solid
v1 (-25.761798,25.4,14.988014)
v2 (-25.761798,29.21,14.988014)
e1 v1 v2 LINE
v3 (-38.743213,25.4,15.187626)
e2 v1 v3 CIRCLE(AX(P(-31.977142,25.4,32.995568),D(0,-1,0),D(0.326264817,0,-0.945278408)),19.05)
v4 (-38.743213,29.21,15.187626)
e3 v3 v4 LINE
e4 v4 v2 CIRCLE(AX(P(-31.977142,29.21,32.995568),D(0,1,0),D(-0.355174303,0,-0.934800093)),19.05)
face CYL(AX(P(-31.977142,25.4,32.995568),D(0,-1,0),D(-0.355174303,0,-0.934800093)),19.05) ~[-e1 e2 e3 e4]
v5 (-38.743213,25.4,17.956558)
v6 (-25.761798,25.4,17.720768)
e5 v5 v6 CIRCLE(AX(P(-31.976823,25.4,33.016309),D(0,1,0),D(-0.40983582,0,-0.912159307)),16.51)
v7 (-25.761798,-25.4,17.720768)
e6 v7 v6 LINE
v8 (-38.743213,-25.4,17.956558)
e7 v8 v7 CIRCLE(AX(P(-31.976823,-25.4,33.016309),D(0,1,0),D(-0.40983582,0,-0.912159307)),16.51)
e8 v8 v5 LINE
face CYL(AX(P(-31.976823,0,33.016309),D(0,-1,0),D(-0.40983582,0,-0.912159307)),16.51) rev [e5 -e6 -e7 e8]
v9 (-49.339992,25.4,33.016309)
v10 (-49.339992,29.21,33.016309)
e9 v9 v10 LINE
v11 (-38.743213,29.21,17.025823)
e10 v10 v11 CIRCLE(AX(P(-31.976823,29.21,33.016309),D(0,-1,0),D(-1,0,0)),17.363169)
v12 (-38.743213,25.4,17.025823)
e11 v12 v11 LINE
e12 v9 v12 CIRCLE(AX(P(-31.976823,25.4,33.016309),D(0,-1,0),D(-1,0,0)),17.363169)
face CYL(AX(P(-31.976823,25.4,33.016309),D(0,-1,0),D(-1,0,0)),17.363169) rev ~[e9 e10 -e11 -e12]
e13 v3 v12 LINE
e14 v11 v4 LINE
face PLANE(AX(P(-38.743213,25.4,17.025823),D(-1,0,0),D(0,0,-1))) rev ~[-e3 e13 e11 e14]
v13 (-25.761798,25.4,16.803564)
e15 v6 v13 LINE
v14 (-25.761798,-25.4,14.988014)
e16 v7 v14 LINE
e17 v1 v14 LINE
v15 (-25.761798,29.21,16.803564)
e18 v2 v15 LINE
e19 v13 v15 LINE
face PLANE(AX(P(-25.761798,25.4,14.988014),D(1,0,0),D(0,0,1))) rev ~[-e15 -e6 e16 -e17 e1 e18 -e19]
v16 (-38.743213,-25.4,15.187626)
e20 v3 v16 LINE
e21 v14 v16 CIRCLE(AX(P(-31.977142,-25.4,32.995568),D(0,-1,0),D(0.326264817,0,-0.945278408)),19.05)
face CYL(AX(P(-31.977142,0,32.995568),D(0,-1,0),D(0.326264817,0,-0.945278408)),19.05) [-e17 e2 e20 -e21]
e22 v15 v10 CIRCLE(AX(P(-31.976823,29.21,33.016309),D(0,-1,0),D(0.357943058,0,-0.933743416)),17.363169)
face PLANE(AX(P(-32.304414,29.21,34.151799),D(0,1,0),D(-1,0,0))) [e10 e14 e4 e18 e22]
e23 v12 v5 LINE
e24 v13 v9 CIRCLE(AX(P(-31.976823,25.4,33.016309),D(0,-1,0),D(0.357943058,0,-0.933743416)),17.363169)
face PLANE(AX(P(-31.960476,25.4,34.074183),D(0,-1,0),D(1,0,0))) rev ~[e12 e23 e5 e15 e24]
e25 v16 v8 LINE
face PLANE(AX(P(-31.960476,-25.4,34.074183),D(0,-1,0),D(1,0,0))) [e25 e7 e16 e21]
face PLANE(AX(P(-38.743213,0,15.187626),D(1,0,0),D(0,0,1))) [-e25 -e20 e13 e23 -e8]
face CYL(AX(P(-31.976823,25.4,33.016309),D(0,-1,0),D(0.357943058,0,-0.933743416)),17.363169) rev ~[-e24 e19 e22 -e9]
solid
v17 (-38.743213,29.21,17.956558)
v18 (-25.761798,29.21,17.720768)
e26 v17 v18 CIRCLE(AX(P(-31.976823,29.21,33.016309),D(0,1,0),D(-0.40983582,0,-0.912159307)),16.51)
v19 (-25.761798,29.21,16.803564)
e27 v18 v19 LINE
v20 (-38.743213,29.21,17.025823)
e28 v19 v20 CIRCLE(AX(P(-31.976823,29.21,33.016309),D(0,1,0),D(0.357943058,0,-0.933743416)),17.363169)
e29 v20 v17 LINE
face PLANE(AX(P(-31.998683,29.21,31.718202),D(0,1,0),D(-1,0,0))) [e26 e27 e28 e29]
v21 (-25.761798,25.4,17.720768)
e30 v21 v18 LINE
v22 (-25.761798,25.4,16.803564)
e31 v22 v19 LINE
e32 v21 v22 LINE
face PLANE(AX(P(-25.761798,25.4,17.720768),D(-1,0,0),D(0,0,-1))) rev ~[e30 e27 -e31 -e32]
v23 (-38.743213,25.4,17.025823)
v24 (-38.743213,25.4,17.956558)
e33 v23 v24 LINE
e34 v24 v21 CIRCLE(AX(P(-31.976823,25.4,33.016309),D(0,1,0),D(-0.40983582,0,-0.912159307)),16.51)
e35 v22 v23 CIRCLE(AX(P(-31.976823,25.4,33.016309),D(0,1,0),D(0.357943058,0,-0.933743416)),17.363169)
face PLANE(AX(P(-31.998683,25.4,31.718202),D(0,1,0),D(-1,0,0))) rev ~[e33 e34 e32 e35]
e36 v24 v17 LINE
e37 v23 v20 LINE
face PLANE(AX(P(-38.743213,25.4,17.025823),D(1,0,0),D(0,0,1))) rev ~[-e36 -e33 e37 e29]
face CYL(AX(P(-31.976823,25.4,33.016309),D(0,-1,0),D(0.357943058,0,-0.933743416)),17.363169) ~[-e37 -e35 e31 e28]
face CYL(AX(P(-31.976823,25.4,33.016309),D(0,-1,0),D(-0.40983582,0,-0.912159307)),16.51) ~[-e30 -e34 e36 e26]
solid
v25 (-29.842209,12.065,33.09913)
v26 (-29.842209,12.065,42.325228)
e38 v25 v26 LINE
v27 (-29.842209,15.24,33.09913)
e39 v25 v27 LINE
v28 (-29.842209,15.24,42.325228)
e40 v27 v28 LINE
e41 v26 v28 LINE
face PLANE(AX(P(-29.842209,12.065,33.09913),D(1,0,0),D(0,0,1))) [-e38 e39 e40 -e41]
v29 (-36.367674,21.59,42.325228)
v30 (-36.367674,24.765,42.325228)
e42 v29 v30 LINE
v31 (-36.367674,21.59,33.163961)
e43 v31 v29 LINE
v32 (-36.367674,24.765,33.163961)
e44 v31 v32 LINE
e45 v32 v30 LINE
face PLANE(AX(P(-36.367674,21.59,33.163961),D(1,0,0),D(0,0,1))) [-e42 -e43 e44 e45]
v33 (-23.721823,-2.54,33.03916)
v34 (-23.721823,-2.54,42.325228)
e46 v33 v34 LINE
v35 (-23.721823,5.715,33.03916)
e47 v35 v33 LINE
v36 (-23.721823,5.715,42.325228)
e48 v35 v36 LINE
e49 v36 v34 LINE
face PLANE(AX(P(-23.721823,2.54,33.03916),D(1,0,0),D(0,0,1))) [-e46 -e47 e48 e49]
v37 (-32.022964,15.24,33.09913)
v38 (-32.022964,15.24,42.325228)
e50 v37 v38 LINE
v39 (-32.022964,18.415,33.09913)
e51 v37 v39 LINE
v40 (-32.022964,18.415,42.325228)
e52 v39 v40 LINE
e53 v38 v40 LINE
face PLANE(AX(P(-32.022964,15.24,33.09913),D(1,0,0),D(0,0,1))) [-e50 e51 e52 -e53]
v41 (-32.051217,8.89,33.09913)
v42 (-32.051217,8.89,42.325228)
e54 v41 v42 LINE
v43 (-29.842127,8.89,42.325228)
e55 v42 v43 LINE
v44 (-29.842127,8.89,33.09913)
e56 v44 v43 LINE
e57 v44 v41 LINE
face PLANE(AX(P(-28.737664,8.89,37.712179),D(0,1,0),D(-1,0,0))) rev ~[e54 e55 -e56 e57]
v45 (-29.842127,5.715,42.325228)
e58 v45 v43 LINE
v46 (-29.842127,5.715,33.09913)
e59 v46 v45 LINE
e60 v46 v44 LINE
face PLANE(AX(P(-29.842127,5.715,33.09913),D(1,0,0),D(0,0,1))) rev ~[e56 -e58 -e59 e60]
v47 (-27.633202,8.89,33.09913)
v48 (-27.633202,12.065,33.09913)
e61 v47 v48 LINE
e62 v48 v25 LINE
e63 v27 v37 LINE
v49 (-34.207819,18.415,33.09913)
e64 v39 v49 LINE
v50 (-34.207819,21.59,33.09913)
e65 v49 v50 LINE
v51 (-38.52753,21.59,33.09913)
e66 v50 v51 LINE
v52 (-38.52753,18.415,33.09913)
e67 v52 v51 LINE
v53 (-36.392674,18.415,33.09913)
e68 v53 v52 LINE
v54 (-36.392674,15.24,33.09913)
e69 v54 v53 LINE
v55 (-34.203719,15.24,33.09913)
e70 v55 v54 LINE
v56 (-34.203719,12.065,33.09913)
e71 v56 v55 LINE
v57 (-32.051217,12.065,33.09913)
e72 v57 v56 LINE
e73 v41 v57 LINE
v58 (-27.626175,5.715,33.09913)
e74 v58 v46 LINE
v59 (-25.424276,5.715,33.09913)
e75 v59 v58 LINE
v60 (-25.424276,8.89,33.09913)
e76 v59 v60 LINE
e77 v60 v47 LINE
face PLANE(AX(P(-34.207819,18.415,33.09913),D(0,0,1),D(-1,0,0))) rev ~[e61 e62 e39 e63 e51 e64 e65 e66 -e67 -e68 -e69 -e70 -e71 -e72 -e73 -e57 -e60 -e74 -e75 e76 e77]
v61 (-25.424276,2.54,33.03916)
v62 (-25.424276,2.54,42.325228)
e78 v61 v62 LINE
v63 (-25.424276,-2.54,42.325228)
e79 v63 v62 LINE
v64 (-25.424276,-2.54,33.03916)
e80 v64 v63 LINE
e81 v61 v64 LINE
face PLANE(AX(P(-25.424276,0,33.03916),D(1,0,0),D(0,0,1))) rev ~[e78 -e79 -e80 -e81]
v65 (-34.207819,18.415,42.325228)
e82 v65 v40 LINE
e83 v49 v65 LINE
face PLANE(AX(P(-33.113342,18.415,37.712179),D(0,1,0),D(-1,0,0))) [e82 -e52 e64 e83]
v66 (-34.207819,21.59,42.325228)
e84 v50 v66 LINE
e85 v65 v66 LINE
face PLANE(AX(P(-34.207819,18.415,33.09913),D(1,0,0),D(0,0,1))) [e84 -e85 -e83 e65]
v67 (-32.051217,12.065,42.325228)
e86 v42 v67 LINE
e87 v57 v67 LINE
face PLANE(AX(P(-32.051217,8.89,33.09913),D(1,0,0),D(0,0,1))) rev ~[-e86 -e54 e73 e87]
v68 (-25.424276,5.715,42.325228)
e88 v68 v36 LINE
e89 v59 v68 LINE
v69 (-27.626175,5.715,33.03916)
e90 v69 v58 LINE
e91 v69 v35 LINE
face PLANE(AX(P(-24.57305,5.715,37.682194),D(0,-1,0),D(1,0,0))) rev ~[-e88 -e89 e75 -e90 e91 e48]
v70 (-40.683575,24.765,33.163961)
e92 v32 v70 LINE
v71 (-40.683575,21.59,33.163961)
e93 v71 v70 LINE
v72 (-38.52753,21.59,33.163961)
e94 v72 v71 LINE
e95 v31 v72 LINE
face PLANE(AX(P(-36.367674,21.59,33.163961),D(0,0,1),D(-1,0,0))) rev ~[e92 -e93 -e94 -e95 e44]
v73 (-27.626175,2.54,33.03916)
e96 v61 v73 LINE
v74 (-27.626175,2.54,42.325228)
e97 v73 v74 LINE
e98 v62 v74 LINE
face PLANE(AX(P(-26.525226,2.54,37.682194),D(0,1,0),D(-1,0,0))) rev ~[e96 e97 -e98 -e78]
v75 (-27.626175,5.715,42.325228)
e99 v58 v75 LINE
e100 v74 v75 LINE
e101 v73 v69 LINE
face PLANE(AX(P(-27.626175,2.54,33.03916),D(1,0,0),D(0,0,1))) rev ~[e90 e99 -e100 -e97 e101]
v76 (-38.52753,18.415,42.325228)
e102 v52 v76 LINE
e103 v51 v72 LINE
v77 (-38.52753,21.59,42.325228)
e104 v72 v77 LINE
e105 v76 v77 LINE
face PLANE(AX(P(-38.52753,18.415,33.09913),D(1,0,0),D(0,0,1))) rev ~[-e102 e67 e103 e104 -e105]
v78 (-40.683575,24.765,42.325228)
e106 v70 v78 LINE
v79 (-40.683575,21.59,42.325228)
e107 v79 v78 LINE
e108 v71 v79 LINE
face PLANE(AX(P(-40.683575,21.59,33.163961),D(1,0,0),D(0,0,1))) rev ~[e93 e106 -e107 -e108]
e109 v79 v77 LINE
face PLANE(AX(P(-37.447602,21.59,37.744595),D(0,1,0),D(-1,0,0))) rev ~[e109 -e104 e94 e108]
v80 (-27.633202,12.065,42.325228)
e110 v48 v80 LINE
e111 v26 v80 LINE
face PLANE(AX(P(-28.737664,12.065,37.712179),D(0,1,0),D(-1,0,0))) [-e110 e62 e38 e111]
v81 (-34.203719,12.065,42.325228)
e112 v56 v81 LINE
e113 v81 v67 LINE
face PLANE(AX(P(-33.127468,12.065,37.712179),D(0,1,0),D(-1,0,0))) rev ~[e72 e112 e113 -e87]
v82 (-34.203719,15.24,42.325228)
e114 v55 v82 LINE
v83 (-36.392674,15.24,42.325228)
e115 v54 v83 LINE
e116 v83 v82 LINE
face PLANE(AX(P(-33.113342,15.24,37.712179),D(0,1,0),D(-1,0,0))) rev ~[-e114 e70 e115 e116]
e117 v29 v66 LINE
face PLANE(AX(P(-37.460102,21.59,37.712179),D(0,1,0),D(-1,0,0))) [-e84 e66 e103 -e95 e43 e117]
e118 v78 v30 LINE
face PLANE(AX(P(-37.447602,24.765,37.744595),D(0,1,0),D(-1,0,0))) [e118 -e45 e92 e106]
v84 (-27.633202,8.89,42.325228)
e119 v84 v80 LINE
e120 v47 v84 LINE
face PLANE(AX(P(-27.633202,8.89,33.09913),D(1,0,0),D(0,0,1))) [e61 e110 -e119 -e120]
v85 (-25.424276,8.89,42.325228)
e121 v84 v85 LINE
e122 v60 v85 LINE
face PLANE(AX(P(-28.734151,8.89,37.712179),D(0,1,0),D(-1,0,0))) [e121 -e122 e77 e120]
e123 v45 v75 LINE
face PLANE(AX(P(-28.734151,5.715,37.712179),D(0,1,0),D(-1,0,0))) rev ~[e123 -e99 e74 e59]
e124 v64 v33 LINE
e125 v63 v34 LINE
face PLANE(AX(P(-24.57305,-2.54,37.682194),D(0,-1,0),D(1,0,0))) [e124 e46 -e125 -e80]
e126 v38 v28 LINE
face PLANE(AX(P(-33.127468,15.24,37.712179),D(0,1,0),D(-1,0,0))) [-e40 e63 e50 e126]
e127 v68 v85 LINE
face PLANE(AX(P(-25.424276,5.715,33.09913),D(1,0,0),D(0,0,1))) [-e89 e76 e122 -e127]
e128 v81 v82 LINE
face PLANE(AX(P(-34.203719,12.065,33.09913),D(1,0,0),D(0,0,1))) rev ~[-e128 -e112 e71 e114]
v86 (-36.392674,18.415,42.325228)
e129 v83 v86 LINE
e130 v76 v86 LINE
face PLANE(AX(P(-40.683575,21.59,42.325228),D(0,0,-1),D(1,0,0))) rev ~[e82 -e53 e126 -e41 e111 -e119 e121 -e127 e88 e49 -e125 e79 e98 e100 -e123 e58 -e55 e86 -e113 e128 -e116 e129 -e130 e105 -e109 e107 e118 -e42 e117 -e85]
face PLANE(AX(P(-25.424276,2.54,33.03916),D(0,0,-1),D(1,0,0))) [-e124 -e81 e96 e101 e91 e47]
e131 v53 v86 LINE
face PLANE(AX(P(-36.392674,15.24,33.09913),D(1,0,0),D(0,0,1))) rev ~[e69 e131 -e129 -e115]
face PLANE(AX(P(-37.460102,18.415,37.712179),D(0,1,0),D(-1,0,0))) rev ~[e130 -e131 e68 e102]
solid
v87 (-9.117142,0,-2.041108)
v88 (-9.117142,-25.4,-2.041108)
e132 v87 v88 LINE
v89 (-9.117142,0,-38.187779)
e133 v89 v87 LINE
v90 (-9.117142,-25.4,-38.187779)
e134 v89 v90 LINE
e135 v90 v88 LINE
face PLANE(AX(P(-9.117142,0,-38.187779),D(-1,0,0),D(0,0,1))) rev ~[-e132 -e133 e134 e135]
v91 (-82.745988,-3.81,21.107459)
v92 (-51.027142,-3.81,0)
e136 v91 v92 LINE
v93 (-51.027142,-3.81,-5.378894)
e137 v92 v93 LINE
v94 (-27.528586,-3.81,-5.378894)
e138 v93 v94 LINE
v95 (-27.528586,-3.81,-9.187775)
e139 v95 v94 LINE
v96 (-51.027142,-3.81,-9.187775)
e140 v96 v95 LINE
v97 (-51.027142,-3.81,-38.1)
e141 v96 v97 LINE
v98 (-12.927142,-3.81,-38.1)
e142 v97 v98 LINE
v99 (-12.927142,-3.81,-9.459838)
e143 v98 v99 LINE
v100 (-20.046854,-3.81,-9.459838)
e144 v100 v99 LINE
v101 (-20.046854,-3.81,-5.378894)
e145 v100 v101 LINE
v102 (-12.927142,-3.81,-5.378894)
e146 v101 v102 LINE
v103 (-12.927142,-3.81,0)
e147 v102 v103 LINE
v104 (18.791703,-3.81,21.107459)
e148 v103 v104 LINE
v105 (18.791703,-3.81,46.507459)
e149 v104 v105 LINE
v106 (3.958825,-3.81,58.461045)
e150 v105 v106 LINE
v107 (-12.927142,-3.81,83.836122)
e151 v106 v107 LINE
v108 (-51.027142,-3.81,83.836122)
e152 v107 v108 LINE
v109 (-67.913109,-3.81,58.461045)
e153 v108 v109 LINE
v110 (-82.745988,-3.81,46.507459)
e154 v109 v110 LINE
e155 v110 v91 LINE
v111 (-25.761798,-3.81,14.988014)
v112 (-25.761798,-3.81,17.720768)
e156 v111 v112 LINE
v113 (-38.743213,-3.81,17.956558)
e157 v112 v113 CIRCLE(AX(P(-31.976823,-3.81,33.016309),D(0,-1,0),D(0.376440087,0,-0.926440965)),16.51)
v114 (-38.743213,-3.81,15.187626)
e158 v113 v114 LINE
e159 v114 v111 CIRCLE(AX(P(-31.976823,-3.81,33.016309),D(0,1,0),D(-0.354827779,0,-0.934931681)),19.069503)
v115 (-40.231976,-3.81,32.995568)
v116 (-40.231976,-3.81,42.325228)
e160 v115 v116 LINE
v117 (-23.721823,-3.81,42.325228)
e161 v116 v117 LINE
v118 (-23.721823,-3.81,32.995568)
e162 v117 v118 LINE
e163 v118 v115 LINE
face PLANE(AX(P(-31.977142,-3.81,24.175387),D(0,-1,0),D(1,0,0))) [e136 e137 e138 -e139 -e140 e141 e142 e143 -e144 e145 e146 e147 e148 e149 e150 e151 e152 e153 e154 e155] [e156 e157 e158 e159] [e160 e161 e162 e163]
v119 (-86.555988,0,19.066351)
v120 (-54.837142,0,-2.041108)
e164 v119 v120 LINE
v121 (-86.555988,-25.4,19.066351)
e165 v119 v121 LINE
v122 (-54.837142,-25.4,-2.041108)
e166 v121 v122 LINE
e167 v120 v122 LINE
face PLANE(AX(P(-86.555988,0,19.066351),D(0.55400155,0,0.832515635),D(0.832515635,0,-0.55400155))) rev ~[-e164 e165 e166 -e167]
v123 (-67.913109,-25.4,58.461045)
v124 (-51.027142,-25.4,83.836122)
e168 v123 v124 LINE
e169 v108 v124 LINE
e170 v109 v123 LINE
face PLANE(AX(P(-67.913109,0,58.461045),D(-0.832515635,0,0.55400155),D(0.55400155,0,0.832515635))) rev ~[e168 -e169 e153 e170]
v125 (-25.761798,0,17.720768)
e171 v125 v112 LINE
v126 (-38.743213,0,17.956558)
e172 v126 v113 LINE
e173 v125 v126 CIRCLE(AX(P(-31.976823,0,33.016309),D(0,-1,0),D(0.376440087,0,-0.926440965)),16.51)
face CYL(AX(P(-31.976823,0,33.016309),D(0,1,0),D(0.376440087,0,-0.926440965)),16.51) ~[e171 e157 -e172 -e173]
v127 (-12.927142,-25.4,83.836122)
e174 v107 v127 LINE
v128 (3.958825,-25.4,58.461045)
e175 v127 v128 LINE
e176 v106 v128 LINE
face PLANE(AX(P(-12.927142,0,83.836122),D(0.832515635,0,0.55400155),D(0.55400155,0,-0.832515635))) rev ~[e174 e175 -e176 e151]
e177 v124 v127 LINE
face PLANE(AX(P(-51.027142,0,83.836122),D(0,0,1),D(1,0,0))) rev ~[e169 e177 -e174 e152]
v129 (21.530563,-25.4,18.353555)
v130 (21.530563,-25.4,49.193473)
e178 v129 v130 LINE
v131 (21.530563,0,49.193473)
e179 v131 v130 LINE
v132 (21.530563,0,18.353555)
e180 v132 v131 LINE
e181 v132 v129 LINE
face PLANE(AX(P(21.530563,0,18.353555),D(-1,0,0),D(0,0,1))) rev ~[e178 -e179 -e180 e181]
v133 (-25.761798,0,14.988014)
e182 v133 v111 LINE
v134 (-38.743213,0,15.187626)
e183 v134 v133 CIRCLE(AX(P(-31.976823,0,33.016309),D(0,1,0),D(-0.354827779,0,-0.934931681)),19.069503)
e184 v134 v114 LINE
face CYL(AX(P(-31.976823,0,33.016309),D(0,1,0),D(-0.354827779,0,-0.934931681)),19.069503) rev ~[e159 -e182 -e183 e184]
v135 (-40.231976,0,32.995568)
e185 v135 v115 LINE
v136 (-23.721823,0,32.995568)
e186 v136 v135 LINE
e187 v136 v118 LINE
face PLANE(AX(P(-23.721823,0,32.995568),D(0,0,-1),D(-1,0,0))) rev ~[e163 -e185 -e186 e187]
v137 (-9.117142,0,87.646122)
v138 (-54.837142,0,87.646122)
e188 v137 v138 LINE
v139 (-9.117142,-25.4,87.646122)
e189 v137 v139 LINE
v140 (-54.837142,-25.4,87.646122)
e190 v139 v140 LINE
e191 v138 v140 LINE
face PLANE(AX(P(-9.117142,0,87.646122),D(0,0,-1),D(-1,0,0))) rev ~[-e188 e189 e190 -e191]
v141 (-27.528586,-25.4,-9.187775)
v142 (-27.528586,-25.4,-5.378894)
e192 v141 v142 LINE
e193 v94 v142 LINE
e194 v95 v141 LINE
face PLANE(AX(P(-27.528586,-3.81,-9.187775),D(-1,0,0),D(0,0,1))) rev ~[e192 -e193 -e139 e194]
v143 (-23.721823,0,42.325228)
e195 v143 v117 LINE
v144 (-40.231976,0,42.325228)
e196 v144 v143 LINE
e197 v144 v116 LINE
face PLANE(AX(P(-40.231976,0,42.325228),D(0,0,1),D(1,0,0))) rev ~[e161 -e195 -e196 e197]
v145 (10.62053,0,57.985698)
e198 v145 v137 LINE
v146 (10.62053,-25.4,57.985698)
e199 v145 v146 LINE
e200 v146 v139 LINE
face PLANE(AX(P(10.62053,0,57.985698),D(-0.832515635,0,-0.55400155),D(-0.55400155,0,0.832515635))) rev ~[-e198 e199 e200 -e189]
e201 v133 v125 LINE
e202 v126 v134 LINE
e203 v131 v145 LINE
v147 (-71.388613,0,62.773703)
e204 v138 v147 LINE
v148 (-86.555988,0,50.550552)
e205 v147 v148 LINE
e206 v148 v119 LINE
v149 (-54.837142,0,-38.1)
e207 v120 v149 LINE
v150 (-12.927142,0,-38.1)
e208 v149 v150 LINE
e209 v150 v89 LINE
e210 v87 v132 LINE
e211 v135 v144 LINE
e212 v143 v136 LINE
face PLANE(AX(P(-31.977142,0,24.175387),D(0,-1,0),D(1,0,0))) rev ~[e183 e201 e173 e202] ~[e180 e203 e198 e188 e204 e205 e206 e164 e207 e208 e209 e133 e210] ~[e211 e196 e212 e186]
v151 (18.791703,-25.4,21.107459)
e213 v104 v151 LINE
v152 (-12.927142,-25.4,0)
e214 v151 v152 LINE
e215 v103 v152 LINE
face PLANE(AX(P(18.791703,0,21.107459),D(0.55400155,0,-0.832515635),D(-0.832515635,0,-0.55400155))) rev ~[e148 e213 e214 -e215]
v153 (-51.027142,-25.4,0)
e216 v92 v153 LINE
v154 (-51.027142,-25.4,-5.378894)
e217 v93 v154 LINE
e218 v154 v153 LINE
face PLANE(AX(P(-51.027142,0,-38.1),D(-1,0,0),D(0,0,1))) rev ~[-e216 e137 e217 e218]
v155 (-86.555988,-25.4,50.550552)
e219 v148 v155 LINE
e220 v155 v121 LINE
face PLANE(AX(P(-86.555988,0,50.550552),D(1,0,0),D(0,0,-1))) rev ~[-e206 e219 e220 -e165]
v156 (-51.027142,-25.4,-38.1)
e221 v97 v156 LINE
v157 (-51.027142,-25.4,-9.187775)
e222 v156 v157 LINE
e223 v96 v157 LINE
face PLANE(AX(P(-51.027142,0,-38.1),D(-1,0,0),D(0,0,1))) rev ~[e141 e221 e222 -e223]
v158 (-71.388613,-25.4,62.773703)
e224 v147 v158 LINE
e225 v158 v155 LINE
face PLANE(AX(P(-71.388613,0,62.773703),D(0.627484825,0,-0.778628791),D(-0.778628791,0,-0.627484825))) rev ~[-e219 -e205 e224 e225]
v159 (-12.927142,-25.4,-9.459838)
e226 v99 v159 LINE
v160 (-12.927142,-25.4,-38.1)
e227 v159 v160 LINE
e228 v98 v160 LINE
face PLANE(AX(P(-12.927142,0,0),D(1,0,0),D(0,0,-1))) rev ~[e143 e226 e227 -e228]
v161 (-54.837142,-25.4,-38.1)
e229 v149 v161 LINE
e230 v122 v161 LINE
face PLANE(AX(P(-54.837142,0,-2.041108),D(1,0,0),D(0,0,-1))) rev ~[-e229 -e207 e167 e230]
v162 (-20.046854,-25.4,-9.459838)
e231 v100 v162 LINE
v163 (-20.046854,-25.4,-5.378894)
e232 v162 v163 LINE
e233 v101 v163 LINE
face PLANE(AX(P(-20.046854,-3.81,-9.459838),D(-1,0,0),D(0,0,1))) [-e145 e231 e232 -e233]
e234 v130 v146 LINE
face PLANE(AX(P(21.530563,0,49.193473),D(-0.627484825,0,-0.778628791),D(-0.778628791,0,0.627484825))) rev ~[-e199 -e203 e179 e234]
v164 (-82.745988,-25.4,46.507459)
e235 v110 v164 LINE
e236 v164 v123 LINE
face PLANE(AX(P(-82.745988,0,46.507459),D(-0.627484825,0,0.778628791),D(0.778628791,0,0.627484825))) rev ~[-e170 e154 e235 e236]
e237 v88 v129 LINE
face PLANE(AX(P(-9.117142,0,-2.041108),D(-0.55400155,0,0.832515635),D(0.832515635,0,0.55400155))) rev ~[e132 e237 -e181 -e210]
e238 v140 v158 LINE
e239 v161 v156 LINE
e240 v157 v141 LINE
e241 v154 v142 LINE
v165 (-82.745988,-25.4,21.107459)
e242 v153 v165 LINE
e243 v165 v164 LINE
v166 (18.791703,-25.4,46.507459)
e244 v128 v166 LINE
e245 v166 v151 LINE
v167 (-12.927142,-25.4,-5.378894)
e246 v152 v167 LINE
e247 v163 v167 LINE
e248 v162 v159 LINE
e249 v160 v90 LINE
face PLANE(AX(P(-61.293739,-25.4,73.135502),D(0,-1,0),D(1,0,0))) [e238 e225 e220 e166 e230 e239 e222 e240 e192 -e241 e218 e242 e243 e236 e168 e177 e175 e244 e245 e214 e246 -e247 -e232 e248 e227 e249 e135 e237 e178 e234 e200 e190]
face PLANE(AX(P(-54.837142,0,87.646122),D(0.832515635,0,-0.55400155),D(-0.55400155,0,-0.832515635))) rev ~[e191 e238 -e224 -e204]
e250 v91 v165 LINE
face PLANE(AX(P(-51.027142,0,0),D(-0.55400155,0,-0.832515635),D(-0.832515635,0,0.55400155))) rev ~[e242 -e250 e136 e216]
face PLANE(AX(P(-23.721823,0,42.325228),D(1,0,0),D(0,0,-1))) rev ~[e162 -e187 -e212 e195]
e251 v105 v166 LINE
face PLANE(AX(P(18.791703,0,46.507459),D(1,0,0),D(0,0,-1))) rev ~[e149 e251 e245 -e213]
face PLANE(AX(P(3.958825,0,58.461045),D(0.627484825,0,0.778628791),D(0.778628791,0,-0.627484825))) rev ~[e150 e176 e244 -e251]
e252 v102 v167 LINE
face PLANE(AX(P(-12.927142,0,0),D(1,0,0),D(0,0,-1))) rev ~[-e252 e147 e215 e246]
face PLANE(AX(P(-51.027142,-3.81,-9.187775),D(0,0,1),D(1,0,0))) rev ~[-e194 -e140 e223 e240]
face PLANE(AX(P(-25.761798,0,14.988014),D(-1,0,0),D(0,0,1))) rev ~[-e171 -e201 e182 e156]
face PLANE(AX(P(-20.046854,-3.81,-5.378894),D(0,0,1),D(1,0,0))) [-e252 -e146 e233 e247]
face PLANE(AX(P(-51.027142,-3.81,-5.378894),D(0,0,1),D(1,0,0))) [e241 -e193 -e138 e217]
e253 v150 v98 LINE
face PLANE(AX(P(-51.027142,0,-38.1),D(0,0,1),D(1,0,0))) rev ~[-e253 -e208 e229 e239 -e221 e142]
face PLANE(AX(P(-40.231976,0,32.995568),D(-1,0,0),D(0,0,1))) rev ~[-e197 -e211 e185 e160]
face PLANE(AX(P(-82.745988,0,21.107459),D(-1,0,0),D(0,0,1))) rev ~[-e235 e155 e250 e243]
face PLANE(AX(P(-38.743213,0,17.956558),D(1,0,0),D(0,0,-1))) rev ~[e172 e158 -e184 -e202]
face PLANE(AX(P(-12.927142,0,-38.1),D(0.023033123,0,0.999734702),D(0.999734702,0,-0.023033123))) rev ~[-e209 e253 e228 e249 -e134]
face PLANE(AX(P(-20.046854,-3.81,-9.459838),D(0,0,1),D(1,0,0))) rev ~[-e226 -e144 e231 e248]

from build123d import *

# Parameters (mm, degrees)
F1_DEPTH  = 25.4
F2_DEPTH  = 25.4
F3_DEPTH  = 3.81
F5_W      = 23.4985564016
F5_H      = 3.8088811561
F5_W_2    = 7.119712124
F5_H_2    = 4.0809446946
F6_DEPTH  = 21.59
F7_W      = 1.7024531355
F7_H      = 9.2860683799
F8_DEPTH  = 2.54
F9_W      = 2.2018989548
F9_H      = 9.2860683799
F10_DEPTH = 3.175
F11_DEPTH = 3.175
F12_W     = 2.2159516811
F12_H     = 9.2260986567
F12_W_2   = 2.2018989548
F13_DEPTH = 3.175
F14_W     = 2.208925318
F14_H     = 9.2260986567
F14_W_2   = 2.2090896964
F15_DEPTH = 3.175
F16_W     = 2.1525025368
F16_H     = 9.2260986567
F16_W_2   = 2.2090075072
F17_DEPTH = 3.175
F18_W     = 2.180755022
F18_H     = 9.2260986567
F18_W_2   = 2.1889545023
F19_DEPTH = 3.175
F20_W     = 2.1348558366
F20_H     = 9.2260986567
F20_W_2   = 2.1848547622
F21_DEPTH = 3.175
F22_W     = 2.1598552994
F22_H     = 9.1612674296
F22_W_2   = 2.1560452878
F23_DEPTH = 3.175
F24_DEPTH = 3.81


with BuildPart() as f1:
    # F0 (on Front) → F1 (new body)
    with BuildSketch(Plane.XZ):
        Polygon((-71.3886133739, 62.7737028413), (-67.9131094975, 58.461044946), (-51.0271422677, 83.8361215117), (-54.8371422677, 87.6461215117), align=None)
        Polygon((-86.5559879748, 50.5505517126), (-82.7459879748, 46.5074590373), (-67.9131094975, 58.461044946), (-71.3886133739, 62.7737028413), align=None)
        Polygon((-86.5559879748, 19.0663513101), (-82.7459879748, 21.1074590373), (-82.7459879748, 46.5074590373), (-86.5559879748, 50.5505517126), align=None)
        Polygon((-54.8371422677, -2.0411077271), (-51.0271422677, 0), (-82.7459879748, 21.1074590373), (-86.5559879748, 19.0663513101), align=None)
        Polygon((-51.0271422677, -9.4391499932), (-51.0271422677, 0), (-54.8371422677, -2.0411077271), (-54.8371422677, -38.1), (-51.0271422677, -38.1), align=None)
        Polygon((-54.8371422677, 87.6461215117), (-51.0271422677, 83.8361215117), (-12.9271422677, 83.8361215117), (-9.1171422677, 87.6461215117), align=None)
        Polygon((-9.1171422677, 87.6461215117), (-12.9271422677, 83.8361215117), (3.9588249621, 58.461044946), (10.6205295243, 57.9856983845), align=None)
        Polygon((10.6205295243, 57.9856983845), (3.9588249621, 58.461044946), (18.7917034394, 46.5074590373), (21.5305625329, 49.1934725845), align=None)
        Polygon((18.7917034394, 46.5074590373), (18.7917034394, 21.1074590373), (21.5305625329, 18.3535554217), (21.5305625329, 49.1934725845), align=None)
        Polygon((18.7917034394, 21.1074590373), (-12.9271422677, 0), (-9.1171422677, -2.0411077271), (21.5305625329, 18.3535554217), align=None)
        Polygon((-12.9271422677, -9.4391499932), (-12.9271422677, -38.1), (-9.1171422677, -38.1877794862), (-9.1171422677, -2.0411077271), (-12.9271422677, 0), align=None)
    extrude(amount=F1_DEPTH)

    # F0 (on Front) → F3 (join)
    with BuildSketch(Plane.XZ):
        Polygon((-82.7459879748, 21.1074590373), (-51.0271422677, 0), (-51.0271422677, -9.4391499932), (-51.0271422677, -38.1), (-12.9271422677, -38.1), (-12.9271422677, -9.4391499932), (-12.9271422677, 0), (18.7917034394, 21.1074590373), (18.7917034394, 46.5074590373), (3.9588249621, 58.461044946), (-12.9271422677, 83.8361215117), (-51.0271422677, 83.8361215117), (-67.9131094975, 58.461044946), (-82.7459879748, 46.5074590373), align=None)
        with BuildLine():
            ThreePointArc((-38.7432127325, 15.1876261035), (-31.6836311373, 52.0835575626), (-25.7617975071, 14.988014205))
            Line((-25.7617975071, 14.988014205), (-25.7617975071, 17.7207682707))
            ThreePointArc((-25.7617975071, 17.7207682707), (-31.676990567, 49.5235857889), (-38.7432127325, 17.9565584449))
            Line((-38.7432127325, 17.9565584449), (-38.7432127325, 15.1876261035))
        make_face(mode=Mode.SUBTRACT)
        Polygon((-23.7218233431, 32.9955678842), (-31.9771422677, 32.9955678842), (-40.2319762915, 32.9955678842), (-40.2319762915, 42.3252284527), (-23.7218233431, 42.3252284527), (-23.7218233431, 33.0163085965), align=None, mode=Mode.SUBTRACT)
    extrude(amount=F3_DEPTH)

    # F5 (on face) → F6 (join)
    with BuildSketch(Plane.XZ.offset(3.81)):
        with Locations((-39.2778640669, -7.2833341546)):
            Rectangle(F5_W, F5_H)
        with Locations((-16.4869983297, -7.4193659239)):
            Rectangle(F5_W_2, F5_H_2)
    extrude(amount=F6_DEPTH)


with BuildPart() as f2:
    # F0 (on Front) → F2 (new body, symmetric)
    with BuildSketch(Plane.XZ):
        with BuildLine():
            Line((-25.7617975071, 17.7207682707), (-25.7617975071, 14.988014205))
            ThreePointArc((-25.7617975071, 14.988014205), (-31.6842499191, 52.043316152), (-38.7432127325, 15.1876261035))
            Line((-38.7432127325, 15.1876261035), (-38.7432127325, 17.9565584449))
            ThreePointArc((-38.7432127325, 17.9565584449), (-31.676990567, 49.5235857889), (-25.7617975071, 17.7207682707))
        make_face()
    extrude(amount=F2_DEPTH, both=True)

    # F4 (on face) → F24, piece 2 (join)
    with BuildSketch(Plane(origin=(0, 25.4, 0), x_dir=(-1, 0, 0), z_dir=(0, 1, 0))):
        with BuildLine():
            ThreePointArc((25.7617975071, 16.8035637745), (22.1389603555, 47.3235128183), (49.3399924318, 33.0163085965))
            ThreePointArc((49.3399924318, 33.0163085965), (46.4503440601, 23.4248103372), (38.7432127325, 17.0258234433))
            Line((38.7432127325, 17.0258234433), (38.7432127325, 15.1876261035))
            ThreePointArc((38.7432127325, 15.1876261035), (31.6842499191, 52.043316152), (25.7617975071, 14.988014205))
            Line((25.7617975071, 14.988014205), (25.7617975071, 16.8035637745))
        make_face()
    extrude(amount=F24_DEPTH)


with BuildPart() as f8:
    # F7 (on face) → F8 (new body, symmetric)
    with BuildSketch(Plane.XZ):
        with Locations((-24.5730499108, 37.6821942627)):
            Rectangle(F7_W, F7_H)
    extrude(amount=F8_DEPTH, both=True)

    # F9 (on face) → F10 (join)
    with BuildSketch(Plane(origin=(0, 2.54, 0), x_dir=(-1, 0, 0), z_dir=(0, 1, 0))):
        with Locations((26.525225956, 37.6821942627)):
            Rectangle(F9_W, F9_H)
    extrude(amount=F10_DEPTH)

    # F11 (add): a face of the model
    f11_faces = [f8.faces().sort_by_distance(p)[0] for p in [
        (-24.5730499108, 2.54, 37.6821942627),
    ]]
    extrude(f11_faces, amount=F11_DEPTH)

    # F12 (on face) → F13 (join)
    with BuildSketch(Plane(origin=(0, 5.715, 0), x_dir=(-1, 0, 0), z_dir=(0, 1, 0))):
        with Locations((28.734151274, 37.7121791244)):
            Rectangle(F12_W, F12_H)
        with Locations((26.525225956, 37.7121791244)):
            Rectangle(F12_W_2, F12_H)
    extrude(amount=F13_DEPTH)

    # F14 (on face) → F15 (join)
    with BuildSketch(Plane(origin=(0, 8.89, 0), x_dir=(-1, 0, 0), z_dir=(0, 1, 0))):
        with Locations((28.7376644555, 37.7121791244)):
            Rectangle(F14_W, F14_H)
        with Locations((30.9466719627, 37.7121791244)):
            Rectangle(F14_W_2, F14_H)
    extrude(amount=F15_DEPTH)

    # F16 (on face) → F17 (join)
    with BuildSketch(Plane(origin=(0, 12.065, 0), x_dir=(-1, 0, 0), z_dir=(0, 1, 0))):
        with Locations((33.1274680793, 37.7121791244)):
            Rectangle(F16_W, F16_H)
        with Locations((30.9467130573, 37.7121791244)):
            Rectangle(F16_W_2, F16_H)
    extrude(amount=F17_DEPTH)

    # F18 (on face) → F19 (join)
    with BuildSketch(Plane(origin=(0, 15.24, 0), x_dir=(-1, 0, 0), z_dir=(0, 1, 0))):
        with Locations((33.1133418367, 37.7121791244)):
            Rectangle(F18_W, F18_H)
        with Locations((35.2981965989, 37.7121791244)):
            Rectangle(F18_W_2, F18_H)
    extrude(amount=F19_DEPTH)

    # F20 (on face) → F21 (join)
    with BuildSketch(Plane(origin=(0, 18.415, 0), x_dir=(-1, 0, 0), z_dir=(0, 1, 0))):
        with Locations((37.4601017684, 37.7121791244)):
            Rectangle(F20_W, F20_H)
        with Locations((35.300246469, 37.7121791244)):
            Rectangle(F20_W_2, F20_H)
    extrude(amount=F21_DEPTH)

    # F22 (on face) → F23 (join)
    with BuildSketch(Plane(origin=(0, 21.59, 0), x_dir=(-1, 0, 0), z_dir=(0, 1, 0))):
        with Locations((37.447602037, 37.7445947379)):
            Rectangle(F22_W, F22_H)
        with Locations((39.6055523306, 37.7445947379)):
            Rectangle(F22_W_2, F22_H)
    extrude(amount=F23_DEPTH)


with BuildPart() as f24:
    # F4 (on face) → F24 (new body)
    with BuildSketch(Plane(origin=(0, 25.4, 0), x_dir=(-1, 0, 0), z_dir=(0, 1, 0))):
        with BuildLine():
            Line((25.7617975071, 17.7207682707), (25.7617975071, 16.8035637745))
            ThreePointArc((25.7617975071, 16.8035637745), (32.2740610966, 15.6556838807), (38.7432127325, 17.0258234433))
            Line((38.7432127325, 17.0258234433), (38.7432127325, 17.9565584449))
            ThreePointArc((38.7432127325, 17.9565584449), (31.676990567, 49.5235857889), (25.7617975071, 17.7207682707))
        make_face()
    extrude(amount=F24_DEPTH)


solid = Compound([f1.part, f2.part, f8.part, f24.part])
